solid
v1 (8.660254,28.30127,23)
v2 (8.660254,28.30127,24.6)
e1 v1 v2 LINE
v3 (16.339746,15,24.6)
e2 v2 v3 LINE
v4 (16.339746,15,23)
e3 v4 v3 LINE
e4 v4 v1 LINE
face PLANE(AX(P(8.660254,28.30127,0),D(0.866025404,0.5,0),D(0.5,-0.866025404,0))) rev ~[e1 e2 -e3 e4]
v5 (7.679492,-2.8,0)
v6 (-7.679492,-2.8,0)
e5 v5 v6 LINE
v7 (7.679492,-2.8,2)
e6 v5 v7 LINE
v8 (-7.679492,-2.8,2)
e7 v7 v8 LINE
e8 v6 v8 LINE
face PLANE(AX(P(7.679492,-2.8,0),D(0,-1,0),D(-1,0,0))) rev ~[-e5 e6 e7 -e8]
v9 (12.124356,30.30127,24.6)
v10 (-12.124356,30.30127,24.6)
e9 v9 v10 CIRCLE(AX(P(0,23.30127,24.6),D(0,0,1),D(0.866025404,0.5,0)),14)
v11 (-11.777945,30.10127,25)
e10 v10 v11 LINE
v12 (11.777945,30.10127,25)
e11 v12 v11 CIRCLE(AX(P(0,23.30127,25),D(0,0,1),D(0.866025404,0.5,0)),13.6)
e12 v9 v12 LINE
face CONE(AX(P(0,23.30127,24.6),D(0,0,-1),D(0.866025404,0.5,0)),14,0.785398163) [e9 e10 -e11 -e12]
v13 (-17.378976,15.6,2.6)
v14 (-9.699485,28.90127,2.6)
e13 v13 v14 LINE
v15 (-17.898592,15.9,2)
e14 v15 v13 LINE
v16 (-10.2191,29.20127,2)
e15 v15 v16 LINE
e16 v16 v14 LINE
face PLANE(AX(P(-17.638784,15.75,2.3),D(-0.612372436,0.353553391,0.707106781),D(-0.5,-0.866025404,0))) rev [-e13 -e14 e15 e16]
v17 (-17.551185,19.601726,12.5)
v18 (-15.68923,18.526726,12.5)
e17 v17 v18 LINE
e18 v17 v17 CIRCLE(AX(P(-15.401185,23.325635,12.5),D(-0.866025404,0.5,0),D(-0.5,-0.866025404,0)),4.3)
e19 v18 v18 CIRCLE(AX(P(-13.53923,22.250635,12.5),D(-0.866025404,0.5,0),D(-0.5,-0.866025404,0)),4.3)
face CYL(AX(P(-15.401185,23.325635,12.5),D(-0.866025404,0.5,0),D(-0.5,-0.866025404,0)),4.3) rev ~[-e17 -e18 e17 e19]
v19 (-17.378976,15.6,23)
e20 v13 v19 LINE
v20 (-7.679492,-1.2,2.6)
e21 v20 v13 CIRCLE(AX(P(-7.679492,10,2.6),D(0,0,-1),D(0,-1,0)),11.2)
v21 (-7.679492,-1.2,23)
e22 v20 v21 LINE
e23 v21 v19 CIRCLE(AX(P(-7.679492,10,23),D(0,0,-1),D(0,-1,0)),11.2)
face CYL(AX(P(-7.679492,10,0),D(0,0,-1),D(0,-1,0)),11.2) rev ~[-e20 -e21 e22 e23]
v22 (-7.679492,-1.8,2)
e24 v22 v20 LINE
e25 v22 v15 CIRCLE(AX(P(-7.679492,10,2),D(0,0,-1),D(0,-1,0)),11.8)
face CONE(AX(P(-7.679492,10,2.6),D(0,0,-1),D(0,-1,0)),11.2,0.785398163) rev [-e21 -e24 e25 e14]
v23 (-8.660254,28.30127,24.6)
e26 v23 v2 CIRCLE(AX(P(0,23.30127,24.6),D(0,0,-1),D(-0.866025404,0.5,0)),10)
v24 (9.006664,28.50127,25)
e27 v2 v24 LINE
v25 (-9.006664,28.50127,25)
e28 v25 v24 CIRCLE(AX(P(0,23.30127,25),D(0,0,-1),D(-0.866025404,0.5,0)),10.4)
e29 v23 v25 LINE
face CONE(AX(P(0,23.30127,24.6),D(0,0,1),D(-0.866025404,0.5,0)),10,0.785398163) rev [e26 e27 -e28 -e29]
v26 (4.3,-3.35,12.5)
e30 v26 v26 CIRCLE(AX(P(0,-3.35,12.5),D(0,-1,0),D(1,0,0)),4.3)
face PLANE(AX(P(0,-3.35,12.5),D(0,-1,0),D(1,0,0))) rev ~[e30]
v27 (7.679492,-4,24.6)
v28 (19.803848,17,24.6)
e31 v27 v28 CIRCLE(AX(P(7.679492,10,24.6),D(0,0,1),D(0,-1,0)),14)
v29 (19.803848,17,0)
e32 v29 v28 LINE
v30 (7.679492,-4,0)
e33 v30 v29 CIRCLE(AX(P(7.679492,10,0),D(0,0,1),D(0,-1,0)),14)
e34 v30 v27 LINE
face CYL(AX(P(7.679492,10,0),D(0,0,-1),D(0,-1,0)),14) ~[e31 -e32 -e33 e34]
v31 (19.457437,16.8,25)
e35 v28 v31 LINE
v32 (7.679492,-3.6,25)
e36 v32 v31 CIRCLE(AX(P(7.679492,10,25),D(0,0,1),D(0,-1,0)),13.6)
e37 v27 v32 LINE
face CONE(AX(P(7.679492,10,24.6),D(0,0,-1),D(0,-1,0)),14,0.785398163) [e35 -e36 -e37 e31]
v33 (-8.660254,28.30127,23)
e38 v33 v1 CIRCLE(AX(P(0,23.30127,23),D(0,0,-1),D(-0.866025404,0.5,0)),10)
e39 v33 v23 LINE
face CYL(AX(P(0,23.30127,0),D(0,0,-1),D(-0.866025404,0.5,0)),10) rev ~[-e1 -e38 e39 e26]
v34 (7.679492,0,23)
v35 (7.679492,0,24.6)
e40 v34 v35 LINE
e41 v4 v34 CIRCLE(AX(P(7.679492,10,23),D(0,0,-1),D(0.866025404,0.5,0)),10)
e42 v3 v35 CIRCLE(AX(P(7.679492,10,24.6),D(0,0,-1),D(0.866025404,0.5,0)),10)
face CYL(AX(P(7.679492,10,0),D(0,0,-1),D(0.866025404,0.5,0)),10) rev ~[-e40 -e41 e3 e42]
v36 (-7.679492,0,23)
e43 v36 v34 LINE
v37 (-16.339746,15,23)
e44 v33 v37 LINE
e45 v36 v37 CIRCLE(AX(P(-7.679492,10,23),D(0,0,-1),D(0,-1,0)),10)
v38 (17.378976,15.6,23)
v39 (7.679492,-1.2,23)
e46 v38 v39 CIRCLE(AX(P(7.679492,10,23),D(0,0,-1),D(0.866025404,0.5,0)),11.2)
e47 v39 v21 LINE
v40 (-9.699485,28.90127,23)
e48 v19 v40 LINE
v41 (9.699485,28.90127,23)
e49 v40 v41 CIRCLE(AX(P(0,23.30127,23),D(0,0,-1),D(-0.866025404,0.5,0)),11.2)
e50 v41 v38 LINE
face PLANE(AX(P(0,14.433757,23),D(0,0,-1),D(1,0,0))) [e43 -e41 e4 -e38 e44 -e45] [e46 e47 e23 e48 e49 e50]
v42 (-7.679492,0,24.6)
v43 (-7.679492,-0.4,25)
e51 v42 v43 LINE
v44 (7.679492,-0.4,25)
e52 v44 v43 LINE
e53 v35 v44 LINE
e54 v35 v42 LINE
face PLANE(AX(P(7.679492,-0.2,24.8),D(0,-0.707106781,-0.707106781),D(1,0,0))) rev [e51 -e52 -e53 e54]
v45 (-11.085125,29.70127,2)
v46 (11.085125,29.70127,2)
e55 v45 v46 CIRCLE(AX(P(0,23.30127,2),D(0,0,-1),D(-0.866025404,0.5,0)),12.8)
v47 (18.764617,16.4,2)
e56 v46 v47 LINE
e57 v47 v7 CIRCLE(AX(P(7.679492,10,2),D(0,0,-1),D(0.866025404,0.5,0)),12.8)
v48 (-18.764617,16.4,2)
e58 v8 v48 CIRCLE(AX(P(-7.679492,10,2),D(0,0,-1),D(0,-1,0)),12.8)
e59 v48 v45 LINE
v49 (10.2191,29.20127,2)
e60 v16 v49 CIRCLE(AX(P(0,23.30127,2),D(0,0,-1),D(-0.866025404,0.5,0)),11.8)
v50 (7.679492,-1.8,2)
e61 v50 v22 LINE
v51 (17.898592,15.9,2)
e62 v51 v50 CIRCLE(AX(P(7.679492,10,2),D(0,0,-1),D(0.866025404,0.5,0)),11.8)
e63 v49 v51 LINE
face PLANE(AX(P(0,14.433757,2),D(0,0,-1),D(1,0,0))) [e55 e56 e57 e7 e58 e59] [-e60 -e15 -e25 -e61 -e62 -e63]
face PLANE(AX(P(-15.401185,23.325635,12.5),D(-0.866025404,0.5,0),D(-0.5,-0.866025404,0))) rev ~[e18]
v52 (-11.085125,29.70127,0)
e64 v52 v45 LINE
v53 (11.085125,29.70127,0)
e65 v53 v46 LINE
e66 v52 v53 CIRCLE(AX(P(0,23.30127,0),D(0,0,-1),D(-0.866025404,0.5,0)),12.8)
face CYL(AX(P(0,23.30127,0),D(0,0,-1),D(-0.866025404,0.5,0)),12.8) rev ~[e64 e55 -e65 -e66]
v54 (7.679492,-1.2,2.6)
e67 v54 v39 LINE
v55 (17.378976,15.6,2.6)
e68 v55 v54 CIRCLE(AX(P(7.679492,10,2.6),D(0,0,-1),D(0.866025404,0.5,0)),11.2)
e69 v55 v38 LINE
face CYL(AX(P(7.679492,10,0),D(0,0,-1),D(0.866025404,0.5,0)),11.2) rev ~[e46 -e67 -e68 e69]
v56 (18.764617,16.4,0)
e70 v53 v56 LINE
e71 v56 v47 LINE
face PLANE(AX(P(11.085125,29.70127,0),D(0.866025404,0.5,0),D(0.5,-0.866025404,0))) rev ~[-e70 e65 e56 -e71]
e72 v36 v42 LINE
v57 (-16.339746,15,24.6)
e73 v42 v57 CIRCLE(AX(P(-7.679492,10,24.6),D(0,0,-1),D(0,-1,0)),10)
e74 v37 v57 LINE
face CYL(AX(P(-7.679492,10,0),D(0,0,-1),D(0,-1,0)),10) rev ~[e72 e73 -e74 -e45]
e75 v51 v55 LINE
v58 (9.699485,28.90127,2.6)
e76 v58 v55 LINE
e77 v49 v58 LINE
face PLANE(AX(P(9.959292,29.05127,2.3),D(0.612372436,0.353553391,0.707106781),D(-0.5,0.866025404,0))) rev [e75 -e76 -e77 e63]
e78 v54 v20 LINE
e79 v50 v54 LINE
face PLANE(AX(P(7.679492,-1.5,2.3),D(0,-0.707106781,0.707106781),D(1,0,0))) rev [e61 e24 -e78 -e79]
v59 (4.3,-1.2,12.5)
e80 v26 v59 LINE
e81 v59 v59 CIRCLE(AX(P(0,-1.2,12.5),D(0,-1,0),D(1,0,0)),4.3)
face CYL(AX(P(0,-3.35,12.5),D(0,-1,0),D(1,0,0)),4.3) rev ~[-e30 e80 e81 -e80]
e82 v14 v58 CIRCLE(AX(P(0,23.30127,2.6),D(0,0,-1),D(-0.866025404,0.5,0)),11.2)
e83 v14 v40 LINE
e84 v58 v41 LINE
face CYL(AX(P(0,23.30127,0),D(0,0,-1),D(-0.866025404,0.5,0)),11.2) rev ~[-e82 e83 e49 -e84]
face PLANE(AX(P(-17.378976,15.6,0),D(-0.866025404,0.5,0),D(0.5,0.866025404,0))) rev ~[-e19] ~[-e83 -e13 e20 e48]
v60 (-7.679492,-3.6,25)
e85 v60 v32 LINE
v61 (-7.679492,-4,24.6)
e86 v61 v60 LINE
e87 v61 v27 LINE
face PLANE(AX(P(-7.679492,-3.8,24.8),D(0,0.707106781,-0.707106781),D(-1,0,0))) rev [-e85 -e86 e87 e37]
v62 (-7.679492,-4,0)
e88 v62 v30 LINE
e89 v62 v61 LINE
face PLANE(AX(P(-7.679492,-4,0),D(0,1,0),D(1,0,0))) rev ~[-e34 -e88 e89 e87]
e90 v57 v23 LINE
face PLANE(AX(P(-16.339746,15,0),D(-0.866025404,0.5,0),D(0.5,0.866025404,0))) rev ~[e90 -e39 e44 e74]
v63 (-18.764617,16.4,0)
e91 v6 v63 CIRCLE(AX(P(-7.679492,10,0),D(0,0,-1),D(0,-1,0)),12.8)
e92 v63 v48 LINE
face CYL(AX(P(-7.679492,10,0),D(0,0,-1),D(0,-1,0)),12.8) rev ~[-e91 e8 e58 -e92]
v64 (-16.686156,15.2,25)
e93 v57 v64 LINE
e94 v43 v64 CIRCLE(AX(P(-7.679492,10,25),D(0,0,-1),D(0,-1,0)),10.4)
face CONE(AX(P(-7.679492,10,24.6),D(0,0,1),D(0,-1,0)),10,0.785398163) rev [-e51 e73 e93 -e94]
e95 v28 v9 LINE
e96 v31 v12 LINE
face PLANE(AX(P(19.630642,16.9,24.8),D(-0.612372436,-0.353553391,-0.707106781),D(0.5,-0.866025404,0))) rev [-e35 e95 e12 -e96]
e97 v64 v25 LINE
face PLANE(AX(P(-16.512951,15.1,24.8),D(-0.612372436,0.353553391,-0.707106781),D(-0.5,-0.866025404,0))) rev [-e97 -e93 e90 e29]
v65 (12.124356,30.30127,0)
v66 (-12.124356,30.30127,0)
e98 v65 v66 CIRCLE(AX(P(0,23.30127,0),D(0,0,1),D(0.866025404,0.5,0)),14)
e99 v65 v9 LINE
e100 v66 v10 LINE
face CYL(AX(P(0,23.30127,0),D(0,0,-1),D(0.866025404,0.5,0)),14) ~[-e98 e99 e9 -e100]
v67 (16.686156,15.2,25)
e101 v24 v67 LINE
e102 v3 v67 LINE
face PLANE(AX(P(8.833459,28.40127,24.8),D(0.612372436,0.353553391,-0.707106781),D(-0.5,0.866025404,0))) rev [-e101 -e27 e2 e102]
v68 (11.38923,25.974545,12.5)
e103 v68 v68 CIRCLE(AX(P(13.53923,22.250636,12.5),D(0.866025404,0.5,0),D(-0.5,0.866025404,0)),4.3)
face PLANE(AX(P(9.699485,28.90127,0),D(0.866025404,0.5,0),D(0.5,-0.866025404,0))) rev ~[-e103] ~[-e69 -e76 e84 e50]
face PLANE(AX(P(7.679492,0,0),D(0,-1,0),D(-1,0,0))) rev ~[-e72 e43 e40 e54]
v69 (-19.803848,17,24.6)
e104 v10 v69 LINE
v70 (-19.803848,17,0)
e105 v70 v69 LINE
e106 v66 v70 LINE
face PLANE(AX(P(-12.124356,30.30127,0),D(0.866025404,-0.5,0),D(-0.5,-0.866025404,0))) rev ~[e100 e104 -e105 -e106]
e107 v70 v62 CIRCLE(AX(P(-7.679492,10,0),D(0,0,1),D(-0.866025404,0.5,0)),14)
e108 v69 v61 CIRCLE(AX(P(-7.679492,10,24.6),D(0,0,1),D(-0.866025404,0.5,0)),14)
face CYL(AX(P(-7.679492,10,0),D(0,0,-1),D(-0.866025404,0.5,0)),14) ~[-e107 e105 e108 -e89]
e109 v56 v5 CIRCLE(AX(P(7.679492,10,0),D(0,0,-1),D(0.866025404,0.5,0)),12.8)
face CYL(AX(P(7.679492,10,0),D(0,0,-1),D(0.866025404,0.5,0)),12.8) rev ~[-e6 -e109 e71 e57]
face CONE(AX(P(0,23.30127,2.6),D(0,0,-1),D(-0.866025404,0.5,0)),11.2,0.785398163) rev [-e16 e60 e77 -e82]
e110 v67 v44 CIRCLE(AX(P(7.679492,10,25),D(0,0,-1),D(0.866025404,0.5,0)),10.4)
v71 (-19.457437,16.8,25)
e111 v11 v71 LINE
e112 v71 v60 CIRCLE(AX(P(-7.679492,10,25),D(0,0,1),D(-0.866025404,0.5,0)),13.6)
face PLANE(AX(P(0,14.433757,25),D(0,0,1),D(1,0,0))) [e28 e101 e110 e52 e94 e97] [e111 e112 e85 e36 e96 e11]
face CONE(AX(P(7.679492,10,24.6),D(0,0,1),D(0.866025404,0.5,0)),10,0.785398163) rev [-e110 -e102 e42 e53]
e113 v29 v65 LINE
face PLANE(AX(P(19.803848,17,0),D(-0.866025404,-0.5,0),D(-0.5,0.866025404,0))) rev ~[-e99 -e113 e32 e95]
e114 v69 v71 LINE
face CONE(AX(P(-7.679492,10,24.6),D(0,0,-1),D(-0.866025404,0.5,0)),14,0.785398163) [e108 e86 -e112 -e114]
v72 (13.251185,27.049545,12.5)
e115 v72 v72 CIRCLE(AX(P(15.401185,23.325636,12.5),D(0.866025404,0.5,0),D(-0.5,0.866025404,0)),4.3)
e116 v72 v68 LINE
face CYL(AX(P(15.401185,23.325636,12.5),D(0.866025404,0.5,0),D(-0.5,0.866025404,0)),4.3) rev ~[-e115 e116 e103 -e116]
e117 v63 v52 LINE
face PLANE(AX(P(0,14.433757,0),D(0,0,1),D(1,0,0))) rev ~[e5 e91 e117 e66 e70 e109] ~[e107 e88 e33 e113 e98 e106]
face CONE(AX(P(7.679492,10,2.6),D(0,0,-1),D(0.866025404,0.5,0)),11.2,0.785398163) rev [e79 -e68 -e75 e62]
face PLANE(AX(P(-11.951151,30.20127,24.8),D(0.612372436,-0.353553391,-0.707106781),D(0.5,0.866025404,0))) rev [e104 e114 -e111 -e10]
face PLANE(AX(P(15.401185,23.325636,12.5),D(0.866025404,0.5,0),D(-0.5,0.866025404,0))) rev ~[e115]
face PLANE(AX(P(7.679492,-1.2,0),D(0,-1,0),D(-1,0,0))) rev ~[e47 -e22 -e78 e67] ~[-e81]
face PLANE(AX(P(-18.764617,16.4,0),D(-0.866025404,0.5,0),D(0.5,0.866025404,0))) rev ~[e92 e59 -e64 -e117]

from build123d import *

# Parameters (mm, degrees)
F1_DEPTH        = 25
F3_START        = -0.65
F2_R            = 4.3
F3_DEPTH        = 2.15
F3_COPIES_COUNT = 3
F6_DEPTH        = 23
F8_DEPTH        = 2
F9_SIZE         = 0.6
F10_SIZE        = 0.4


# Not quite as in the source:
# - a pattern or mirror of a feature is missing from the dataset's text; its kind, count and spacing are read off the source's solid


with BuildPart() as f1:
    # F0 (on Top) → F1 (new body)
    with BuildSketch(Plane.XY):
        with BuildLine():
            ThreePointArc((7.6794919243, -4), (19.8038475773, 3), (19.8038475773, 17))
            Line((19.8038475773, 17), (12.124355653, 30.3012701892))
            ThreePointArc((12.124355653, 30.3012701892), (0, 37.3012701892), (-12.124355653, 30.3012701892))
            Line((-12.124355653, 30.3012701892), (-19.8038475773, 17))
            ThreePointArc((-19.8038475773, 17), (-19.8038475773, 3), (-7.6794919243, -4))
            Line((-7.6794919243, -4), (0, -4))
            Line((0, -4), (7.6794919243, -4))
        make_face()
        with BuildLine():
            Line((7.6794919243, 0), (0, 0))
            Line((0, 0), (-7.6794919243, 0))
            ThreePointArc((-7.6794919243, 0), (-16.3397459622, 5), (-16.3397459622, 15))
            Line((-16.3397459622, 15), (-8.6602540378, 28.3012701892))
            ThreePointArc((-8.6602540378, 28.3012701892), (0, 33.3012701892), (8.6602540378, 28.3012701892))
            Line((8.6602540378, 28.3012701892), (16.3397459622, 15))
            ThreePointArc((16.3397459622, 15), (16.3397459622, 5), (7.6794919243, 0))
        make_face(mode=Mode.SUBTRACT)
    extrude(amount=F1_DEPTH)

    # F2 (on face) → F3 (cut)
    with BuildSketch(Plane(origin=(-22.2141016151, 12.8253175473, 0), x_dir=(-0.5, -0.8660254038, 0), z_dir=(-0.8660254038, 0.5, 0)).offset(F3_START)):
        with Locations((-12.5, 12.5)):
            Circle(F2_R)
    f3 = extrude(amount=-F3_DEPTH, mode=Mode.SUBTRACT)

    # F3_copies: F3 ×3 about axis
    f3_copies_axis = Axis((0, 14.433757, 0), (0, 0, 1))
    for i in range(1, F3_COPIES_COUNT):
        add(f3.rotate(f3_copies_axis, i * 360 / F3_COPIES_COUNT), mode=Mode.SUBTRACT)

    # F5 (on face) → F6 (cut)
    with BuildSketch(Plane(origin=(0, 0, 0), x_dir=(1, 0, 0), z_dir=(0, 0, -1))):
        with BuildLine():
            Line((9.6994845224, -28.9012701892), (17.3789764467, -15.6))
            ThreePointArc((17.3789764467, -15.6), (17.3789764467, -4.4), (7.6794919243, 1.2))
            Line((7.6794919243, 1.2), (-7.6794919243, 1.2))
            ThreePointArc((-7.6794919243, 1.2), (-17.3789764467, -4.4), (-17.3789764467, -15.6))
            Line((-17.3789764467, -15.6), (-9.6994845224, -28.9012701892))
            ThreePointArc((-9.6994845224, -28.9012701892), (0, -34.5012701892), (9.6994845224, -28.9012701892))
        make_face()
    extrude(amount=-F6_DEPTH, mode=Mode.SUBTRACT)

    # F7 (on face) → F8 (cut)
    with BuildSketch(Plane(origin=(0, 0, 0), x_dir=(1, 0, 0), z_dir=(0, 0, -1))):
        with BuildLine():
            Line((11.0851251684, -29.7012701892), (18.7646170928, -16.4))
            ThreePointArc((18.7646170928, -16.4), (18.7646170928, -3.6), (7.6794919243, 2.8))
            Line((7.6794919243, 2.8), (-7.6794919243, 2.8))
            ThreePointArc((-7.6794919243, 2.8), (-18.7646170928, -3.6), (-18.7646170928, -16.4))
            Line((-18.7646170928, -16.4), (-11.0851251684, -29.7012701892))
            ThreePointArc((-11.0851251684, -29.7012701892), (0, -36.1012701892), (11.0851251684, -29.7012701892))
        make_face()
    extrude(amount=-F8_DEPTH, mode=Mode.SUBTRACT)

    # F9
    f9_edges = [f1.edges().sort_by_distance(p)[0] for p in [
        (0, 34.50127, 2),
        (13.53923, 22.250635, 2),
        (17.378976, 4.4, 2),
        (0, -1.2, 2),
        (-17.378976, 4.4, 2),
        (-13.53923, 22.250635, 2),
    ]]
    chamfer(f9_edges, length=F9_SIZE)

    # F10
    f10_edges = [f1.edges().sort_by_distance(p)[0] for p in [
        (19.803848, 3, 25),
        (12.5, 21.650635, 25),
        (0, -4, 25),
        (-19.803848, 3, 25),
        (-15.964102, 23.650635, 25),
        (15.964102, 23.650635, 25),
        (0, 37.30127, 25),
        (16.339746, 5, 25),
        (0, 0, 25),
        (-16.339746, 5, 25),
        (-12.5, 21.650635, 25),
        (0, 33.30127, 25),
    ]]
    chamfer(f10_edges, length=F10_SIZE)


solid = f1.part
